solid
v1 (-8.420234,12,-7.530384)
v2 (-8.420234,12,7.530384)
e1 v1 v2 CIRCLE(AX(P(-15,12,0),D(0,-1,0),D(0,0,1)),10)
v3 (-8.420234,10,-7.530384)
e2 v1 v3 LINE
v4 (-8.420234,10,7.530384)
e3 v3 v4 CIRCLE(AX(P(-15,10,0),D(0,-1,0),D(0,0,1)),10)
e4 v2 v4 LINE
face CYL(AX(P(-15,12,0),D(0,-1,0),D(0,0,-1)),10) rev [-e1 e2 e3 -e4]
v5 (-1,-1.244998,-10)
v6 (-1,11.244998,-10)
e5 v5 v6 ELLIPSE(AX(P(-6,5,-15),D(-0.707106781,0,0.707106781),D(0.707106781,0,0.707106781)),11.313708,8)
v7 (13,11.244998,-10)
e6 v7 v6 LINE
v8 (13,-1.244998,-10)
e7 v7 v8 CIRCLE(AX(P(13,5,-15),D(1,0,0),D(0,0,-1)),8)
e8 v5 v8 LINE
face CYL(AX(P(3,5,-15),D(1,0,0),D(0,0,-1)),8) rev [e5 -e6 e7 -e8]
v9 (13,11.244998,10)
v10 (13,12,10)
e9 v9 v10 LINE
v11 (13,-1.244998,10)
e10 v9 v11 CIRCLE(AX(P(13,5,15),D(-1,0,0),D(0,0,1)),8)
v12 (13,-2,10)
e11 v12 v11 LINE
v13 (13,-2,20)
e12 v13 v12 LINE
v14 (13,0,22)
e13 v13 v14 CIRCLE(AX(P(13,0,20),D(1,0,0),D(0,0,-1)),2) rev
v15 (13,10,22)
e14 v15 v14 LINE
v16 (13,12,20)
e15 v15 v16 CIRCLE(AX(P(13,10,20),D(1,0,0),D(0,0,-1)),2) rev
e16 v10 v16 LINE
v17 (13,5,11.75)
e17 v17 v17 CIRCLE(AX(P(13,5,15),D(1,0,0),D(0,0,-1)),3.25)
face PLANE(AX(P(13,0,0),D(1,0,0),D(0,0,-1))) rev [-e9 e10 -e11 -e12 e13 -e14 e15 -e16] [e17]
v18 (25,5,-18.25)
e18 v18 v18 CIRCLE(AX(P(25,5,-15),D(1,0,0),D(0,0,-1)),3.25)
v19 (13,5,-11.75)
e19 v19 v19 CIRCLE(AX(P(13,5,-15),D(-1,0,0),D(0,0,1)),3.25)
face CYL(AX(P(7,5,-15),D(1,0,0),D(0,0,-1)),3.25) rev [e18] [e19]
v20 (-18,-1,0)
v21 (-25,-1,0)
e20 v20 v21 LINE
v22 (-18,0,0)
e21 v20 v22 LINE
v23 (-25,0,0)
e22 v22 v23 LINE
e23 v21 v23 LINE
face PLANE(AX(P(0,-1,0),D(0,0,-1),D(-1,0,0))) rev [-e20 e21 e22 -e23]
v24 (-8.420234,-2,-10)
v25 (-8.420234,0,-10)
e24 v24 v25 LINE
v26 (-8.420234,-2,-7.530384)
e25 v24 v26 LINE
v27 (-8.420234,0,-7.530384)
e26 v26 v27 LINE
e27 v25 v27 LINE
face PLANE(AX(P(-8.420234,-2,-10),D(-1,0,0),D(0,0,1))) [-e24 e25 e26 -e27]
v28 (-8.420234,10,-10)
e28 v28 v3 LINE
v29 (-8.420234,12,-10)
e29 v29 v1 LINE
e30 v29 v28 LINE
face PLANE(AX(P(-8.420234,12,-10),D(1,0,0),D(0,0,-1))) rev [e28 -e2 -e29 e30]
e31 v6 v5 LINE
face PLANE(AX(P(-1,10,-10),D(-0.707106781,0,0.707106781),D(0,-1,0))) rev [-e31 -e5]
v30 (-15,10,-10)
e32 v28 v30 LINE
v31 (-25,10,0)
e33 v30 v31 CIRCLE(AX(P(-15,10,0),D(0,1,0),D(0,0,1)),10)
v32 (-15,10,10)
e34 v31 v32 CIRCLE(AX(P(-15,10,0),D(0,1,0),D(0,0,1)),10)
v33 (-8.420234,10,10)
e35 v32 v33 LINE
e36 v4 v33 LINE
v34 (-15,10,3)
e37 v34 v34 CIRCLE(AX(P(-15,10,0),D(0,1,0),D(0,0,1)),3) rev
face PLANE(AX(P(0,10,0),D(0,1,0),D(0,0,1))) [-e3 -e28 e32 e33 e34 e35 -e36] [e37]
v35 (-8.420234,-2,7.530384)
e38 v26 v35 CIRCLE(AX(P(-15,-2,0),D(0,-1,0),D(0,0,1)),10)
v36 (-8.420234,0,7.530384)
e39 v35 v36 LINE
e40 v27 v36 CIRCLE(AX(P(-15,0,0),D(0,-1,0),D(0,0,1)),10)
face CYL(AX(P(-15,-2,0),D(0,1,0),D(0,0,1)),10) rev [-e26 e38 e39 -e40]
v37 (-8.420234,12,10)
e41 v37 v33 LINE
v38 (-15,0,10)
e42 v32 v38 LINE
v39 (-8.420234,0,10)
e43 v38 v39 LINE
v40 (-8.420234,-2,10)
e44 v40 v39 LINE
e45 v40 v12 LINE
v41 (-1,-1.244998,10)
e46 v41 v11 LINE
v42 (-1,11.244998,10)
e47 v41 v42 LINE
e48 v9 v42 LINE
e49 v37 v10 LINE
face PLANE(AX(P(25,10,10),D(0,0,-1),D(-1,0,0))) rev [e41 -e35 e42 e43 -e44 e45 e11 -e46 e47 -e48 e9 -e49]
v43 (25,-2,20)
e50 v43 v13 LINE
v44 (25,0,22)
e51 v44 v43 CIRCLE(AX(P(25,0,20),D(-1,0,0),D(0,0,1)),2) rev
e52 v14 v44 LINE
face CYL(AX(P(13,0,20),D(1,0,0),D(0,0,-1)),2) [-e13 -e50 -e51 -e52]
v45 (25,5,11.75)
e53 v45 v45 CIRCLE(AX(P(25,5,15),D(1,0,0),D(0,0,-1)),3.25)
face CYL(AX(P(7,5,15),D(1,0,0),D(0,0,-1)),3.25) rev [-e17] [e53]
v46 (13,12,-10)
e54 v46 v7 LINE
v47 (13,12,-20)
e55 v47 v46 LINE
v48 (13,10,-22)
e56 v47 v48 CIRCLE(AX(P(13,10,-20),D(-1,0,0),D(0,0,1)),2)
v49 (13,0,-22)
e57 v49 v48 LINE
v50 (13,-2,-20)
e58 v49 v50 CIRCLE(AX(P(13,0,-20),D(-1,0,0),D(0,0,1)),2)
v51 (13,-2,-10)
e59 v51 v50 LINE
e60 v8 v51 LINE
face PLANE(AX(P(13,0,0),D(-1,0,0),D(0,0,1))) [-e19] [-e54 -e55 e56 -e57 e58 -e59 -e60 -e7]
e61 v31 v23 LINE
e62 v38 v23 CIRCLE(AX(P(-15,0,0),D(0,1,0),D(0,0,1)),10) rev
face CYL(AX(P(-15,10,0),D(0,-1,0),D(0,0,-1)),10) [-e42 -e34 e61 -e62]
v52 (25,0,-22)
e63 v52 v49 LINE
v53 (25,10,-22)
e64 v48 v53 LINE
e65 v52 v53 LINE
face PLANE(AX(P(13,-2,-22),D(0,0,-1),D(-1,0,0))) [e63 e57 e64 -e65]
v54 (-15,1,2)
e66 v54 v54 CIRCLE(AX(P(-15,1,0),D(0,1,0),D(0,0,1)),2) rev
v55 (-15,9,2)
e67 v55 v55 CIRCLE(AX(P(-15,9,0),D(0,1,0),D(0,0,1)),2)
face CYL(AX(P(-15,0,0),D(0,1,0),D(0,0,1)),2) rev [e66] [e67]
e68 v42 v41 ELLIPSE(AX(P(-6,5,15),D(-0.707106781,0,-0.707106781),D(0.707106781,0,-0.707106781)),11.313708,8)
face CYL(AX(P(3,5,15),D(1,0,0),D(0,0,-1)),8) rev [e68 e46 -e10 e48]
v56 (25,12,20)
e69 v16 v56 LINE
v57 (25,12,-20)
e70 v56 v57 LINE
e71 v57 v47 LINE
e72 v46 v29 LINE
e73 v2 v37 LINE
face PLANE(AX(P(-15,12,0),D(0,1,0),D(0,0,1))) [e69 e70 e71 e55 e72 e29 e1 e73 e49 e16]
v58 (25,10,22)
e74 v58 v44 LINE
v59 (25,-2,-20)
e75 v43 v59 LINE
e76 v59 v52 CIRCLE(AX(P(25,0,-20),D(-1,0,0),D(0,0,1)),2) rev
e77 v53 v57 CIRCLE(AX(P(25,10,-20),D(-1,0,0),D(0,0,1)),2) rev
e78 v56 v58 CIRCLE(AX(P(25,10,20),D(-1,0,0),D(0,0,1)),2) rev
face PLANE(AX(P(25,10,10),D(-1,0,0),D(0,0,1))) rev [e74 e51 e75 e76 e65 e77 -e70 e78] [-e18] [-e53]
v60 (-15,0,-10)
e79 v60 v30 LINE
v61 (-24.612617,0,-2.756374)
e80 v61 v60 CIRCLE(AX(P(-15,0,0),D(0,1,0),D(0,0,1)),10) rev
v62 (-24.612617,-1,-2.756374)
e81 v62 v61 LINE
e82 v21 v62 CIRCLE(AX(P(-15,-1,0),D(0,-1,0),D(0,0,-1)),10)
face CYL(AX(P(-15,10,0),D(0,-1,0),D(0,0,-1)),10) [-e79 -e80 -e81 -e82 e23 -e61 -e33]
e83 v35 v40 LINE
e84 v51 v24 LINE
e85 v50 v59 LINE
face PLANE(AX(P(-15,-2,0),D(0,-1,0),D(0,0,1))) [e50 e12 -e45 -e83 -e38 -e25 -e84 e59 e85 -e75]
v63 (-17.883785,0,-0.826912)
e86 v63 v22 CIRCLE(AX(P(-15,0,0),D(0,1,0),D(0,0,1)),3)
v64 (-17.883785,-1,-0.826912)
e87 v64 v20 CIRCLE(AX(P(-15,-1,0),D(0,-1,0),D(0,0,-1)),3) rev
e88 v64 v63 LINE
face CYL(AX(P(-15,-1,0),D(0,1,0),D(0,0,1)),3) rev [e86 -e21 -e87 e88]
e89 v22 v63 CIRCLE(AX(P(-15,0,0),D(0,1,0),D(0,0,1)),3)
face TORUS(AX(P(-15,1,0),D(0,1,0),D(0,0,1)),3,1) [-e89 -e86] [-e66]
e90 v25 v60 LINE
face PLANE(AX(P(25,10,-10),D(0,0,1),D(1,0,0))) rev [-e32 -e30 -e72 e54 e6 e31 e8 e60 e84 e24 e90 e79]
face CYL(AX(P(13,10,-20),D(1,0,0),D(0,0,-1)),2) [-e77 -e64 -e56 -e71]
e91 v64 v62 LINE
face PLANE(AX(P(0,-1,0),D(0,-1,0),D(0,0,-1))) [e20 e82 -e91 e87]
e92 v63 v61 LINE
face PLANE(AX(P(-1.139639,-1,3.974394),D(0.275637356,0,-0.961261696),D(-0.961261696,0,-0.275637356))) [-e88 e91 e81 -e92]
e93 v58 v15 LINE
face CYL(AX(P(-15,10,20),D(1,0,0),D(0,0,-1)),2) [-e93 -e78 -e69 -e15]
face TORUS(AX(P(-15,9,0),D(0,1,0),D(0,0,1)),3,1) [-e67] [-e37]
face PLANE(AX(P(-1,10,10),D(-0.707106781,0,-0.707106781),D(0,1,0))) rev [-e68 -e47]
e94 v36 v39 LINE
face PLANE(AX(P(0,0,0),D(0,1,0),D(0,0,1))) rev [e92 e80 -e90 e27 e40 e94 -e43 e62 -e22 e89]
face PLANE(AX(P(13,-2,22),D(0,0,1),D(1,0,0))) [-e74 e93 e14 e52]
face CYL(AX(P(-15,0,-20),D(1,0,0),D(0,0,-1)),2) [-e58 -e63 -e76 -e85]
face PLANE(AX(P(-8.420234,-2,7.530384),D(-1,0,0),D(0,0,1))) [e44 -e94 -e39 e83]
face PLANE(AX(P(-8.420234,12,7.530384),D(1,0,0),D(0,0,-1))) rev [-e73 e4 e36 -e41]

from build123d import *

# Parameters (mm, degrees)
SKETCH1_W           = 50
SKETCH1_H           = 20
BOSS_EXTRUDE1_DEPTH = 10
FILLET1_R           = 10
SKETCH2_R           = 2
CUT_EXTRUDE1_DEPTH  = 10
BOSS_EXTRUDE3_DEPTH = 2
FILLET4_R           = 1
SKETCH9_W           = 12
SKETCH9_H           = 14
BOSS_EXTRUDE4_DEPTH = 12
SKETCH10_R          = 3.25
CUT_EXTRUDE4_DEPTH  = 18
SKETCH13_R          = 8
CUT_EXTRUDE5_DEPTH  = 10
CHAMFER4_SIZE       = 4
FILLET6_R           = 2
BOSS_EXTRUDE5_DEPTH = 1


# Some blends are built 0.0001 mm under size
with BuildPart() as part:
    # Sketch1 → Boss-Extrude1 (new body)
    with BuildSketch(Plane(origin=(0, 0, 0), x_dir=(1, 0, 0), z_dir=(0, 1, 0))):
        Rectangle(SKETCH1_W, SKETCH1_H)
    extrude(amount=BOSS_EXTRUDE1_DEPTH)

    # Fillet1
    fillet1_edges = [part.edges().sort_by_distance(p)[0] for p in [
        (-25, 5, 10),
        (-25, 5, -10),
    ]]
    fillet(fillet1_edges, radius=FILLET1_R - 0.0001)  # a hair under: the kernel refuses the full size

    # Sketch2 → Cut-Extrude1 (cut)
    with BuildSketch(Plane(origin=(0, 10, 0), x_dir=(1, 0, 0), z_dir=(0, 1, 0))):
        with Locations(Location((-15, 0, 0), (0, 0, 270))):
            Circle(SKETCH2_R)
    extrude(amount=-CUT_EXTRUDE1_DEPTH, mode=Mode.SUBTRACT)

    # Sketch6 → Boss-Extrude3 (add)
    with BuildSketch(Plane(origin=(0, 10, 0), x_dir=(1, 0, 0), z_dir=(0, 1, 0))):
        with BuildLine():
            Line((-8.420233762, 10), (-8.420233762, 7.53038354))
            ThreePointArc((-8.420233762, 7.53038354), (-5, 0), (-8.420233762, -7.53038354))
            Line((-8.420233762, -7.53038354), (-8.420233762, -10))
            Line((-8.420233762, -10), (25, -10))
            Line((25, -10), (25, 10))
            Line((25, 10), (-8.420233762, 10))
        make_face()
    boss_extrude3 = extrude(amount=BOSS_EXTRUDE3_DEPTH)

    # Mirror3: Boss-Extrude3 across plane
    add(boss_extrude3.mirror(Plane(origin=(0, 5, 0), x_dir=(0, 0, 1), z_dir=(0, -1, 0))))

    # Fillet4
    fillet4_edges = [part.edges().sort_by_distance(p)[0] for p in [
        (-15, 0, -2),
        (-15, 10, -2),
    ]]
    fillet(fillet4_edges, radius=FILLET4_R)

    # Sketch9 → Boss-Extrude4 (add)
    with BuildSketch(Plane(origin=(25, 0, 0), x_dir=(0, 0, -1), z_dir=(1, 0, 0))):
        with Locations((-16, 5)):
            Rectangle(SKETCH9_W, SKETCH9_H)
        with Locations((16, 5)):
            Rectangle(SKETCH9_W, SKETCH9_H)
    extrude(amount=-BOSS_EXTRUDE4_DEPTH)

    # Sketch10 → Cut-Extrude4 (cut)
    with BuildSketch(Plane(origin=(25, 0, 0), x_dir=(0, 0, -1), z_dir=(1, 0, 0))):
        with Locations((-15, 5)):
            Circle(SKETCH10_R)
        with Locations((15, 5)):
            Circle(SKETCH10_R)
    extrude(amount=-CUT_EXTRUDE4_DEPTH, mode=Mode.SUBTRACT)

    # Sketch13 → Cut-Extrude5 (cut)
    with BuildSketch(Plane.ZY.offset(-13)):
        with Locations((15, 5)):
            Circle(SKETCH13_R)
    cut_extrude5 = extrude(amount=CUT_EXTRUDE5_DEPTH, mode=Mode.SUBTRACT)

    # Mirror7: Cut-Extrude5 across plane
    add(cut_extrude5.mirror(Plane.XY), mode=Mode.SUBTRACT)

    # Chamfer4
    # the kernel refuses this chamfer: 4 mm, written as the material it takes off along each edge
    with BuildSketch(Plane(origin=(3, 21.53172995, 10), x_dir=(-0.9996219169112968, 0, 0.027495876610586917), z_dir=(0, -1, 0))) as chamfer4_piece_1_section:
        Polygon((CHAMFER4_SIZE * 0.999621916911, CHAMFER4_SIZE * 0.0274958766106), (-CHAMFER4_SIZE * 0.0274958766106, CHAMFER4_SIZE * 0.999621916911), (0, 0), align=None)
    chamfer4_piece_1 = extrude(amount=33.063459901, mode=Mode.PRIVATE)
    chamfer4_piece_1 = chamfer4_piece_1 & Plane(origin=(1.498847972, 5, 15), x_dir=(0, 0, 1), z_dir=(1, 0, 0)) * Cylinder(8, 83, mode=Mode.PRIVATE)
    add(chamfer4_piece_1, mode=Mode.SUBTRACT)
    with BuildSketch(Plane(origin=(3, 21.53172995, -10), x_dir=(0.027495876610586382, 0, 0.9996219169112968), z_dir=(0, -1, 0))) as chamfer4_piece_2_section:
        Polygon((CHAMFER4_SIZE * 0.999621916911, CHAMFER4_SIZE * 0.0274958766106), (-CHAMFER4_SIZE * 0.0274958766106, CHAMFER4_SIZE * 0.999621916911), (0, 0), align=None)
    chamfer4_piece_2 = extrude(amount=33.063459901, mode=Mode.PRIVATE)
    chamfer4_piece_2 = chamfer4_piece_2 & Plane(origin=(1.498847972, 5, -15), x_dir=(0, 0, -1), z_dir=(1, 0, 0)) * Cylinder(8, 83, mode=Mode.PRIVATE)
    add(chamfer4_piece_2, mode=Mode.SUBTRACT)

    # Fillet6
    fillet6_edges = [part.edges().sort_by_distance(p)[0] for p in [
        (19, -2, 22),
        (19, 12, 22),
        (19, 12, -22),
        (19, -2, -22),
    ]]
    fillet(fillet6_edges, radius=FILLET6_R)

    # Sketch14 → Boss-Extrude5 (add)
    with BuildSketch(Plane.XZ):
        with BuildLine():
            ThreePointArc((-17.883785088, -0.826912067), (-17.970804206, -0.417519303), (-18, 0))
            Line((-18, 0), (-25, 0))
            ThreePointArc((-25, 0), (-24.902680687, -1.39173101), (-24.612616959, -2.756373558))
            Line((-24.612616959, -2.756373558), (-17.883785088, -0.826912067))
        make_face()
    extrude(amount=BOSS_EXTRUDE5_DEPTH)


solid = part.part
